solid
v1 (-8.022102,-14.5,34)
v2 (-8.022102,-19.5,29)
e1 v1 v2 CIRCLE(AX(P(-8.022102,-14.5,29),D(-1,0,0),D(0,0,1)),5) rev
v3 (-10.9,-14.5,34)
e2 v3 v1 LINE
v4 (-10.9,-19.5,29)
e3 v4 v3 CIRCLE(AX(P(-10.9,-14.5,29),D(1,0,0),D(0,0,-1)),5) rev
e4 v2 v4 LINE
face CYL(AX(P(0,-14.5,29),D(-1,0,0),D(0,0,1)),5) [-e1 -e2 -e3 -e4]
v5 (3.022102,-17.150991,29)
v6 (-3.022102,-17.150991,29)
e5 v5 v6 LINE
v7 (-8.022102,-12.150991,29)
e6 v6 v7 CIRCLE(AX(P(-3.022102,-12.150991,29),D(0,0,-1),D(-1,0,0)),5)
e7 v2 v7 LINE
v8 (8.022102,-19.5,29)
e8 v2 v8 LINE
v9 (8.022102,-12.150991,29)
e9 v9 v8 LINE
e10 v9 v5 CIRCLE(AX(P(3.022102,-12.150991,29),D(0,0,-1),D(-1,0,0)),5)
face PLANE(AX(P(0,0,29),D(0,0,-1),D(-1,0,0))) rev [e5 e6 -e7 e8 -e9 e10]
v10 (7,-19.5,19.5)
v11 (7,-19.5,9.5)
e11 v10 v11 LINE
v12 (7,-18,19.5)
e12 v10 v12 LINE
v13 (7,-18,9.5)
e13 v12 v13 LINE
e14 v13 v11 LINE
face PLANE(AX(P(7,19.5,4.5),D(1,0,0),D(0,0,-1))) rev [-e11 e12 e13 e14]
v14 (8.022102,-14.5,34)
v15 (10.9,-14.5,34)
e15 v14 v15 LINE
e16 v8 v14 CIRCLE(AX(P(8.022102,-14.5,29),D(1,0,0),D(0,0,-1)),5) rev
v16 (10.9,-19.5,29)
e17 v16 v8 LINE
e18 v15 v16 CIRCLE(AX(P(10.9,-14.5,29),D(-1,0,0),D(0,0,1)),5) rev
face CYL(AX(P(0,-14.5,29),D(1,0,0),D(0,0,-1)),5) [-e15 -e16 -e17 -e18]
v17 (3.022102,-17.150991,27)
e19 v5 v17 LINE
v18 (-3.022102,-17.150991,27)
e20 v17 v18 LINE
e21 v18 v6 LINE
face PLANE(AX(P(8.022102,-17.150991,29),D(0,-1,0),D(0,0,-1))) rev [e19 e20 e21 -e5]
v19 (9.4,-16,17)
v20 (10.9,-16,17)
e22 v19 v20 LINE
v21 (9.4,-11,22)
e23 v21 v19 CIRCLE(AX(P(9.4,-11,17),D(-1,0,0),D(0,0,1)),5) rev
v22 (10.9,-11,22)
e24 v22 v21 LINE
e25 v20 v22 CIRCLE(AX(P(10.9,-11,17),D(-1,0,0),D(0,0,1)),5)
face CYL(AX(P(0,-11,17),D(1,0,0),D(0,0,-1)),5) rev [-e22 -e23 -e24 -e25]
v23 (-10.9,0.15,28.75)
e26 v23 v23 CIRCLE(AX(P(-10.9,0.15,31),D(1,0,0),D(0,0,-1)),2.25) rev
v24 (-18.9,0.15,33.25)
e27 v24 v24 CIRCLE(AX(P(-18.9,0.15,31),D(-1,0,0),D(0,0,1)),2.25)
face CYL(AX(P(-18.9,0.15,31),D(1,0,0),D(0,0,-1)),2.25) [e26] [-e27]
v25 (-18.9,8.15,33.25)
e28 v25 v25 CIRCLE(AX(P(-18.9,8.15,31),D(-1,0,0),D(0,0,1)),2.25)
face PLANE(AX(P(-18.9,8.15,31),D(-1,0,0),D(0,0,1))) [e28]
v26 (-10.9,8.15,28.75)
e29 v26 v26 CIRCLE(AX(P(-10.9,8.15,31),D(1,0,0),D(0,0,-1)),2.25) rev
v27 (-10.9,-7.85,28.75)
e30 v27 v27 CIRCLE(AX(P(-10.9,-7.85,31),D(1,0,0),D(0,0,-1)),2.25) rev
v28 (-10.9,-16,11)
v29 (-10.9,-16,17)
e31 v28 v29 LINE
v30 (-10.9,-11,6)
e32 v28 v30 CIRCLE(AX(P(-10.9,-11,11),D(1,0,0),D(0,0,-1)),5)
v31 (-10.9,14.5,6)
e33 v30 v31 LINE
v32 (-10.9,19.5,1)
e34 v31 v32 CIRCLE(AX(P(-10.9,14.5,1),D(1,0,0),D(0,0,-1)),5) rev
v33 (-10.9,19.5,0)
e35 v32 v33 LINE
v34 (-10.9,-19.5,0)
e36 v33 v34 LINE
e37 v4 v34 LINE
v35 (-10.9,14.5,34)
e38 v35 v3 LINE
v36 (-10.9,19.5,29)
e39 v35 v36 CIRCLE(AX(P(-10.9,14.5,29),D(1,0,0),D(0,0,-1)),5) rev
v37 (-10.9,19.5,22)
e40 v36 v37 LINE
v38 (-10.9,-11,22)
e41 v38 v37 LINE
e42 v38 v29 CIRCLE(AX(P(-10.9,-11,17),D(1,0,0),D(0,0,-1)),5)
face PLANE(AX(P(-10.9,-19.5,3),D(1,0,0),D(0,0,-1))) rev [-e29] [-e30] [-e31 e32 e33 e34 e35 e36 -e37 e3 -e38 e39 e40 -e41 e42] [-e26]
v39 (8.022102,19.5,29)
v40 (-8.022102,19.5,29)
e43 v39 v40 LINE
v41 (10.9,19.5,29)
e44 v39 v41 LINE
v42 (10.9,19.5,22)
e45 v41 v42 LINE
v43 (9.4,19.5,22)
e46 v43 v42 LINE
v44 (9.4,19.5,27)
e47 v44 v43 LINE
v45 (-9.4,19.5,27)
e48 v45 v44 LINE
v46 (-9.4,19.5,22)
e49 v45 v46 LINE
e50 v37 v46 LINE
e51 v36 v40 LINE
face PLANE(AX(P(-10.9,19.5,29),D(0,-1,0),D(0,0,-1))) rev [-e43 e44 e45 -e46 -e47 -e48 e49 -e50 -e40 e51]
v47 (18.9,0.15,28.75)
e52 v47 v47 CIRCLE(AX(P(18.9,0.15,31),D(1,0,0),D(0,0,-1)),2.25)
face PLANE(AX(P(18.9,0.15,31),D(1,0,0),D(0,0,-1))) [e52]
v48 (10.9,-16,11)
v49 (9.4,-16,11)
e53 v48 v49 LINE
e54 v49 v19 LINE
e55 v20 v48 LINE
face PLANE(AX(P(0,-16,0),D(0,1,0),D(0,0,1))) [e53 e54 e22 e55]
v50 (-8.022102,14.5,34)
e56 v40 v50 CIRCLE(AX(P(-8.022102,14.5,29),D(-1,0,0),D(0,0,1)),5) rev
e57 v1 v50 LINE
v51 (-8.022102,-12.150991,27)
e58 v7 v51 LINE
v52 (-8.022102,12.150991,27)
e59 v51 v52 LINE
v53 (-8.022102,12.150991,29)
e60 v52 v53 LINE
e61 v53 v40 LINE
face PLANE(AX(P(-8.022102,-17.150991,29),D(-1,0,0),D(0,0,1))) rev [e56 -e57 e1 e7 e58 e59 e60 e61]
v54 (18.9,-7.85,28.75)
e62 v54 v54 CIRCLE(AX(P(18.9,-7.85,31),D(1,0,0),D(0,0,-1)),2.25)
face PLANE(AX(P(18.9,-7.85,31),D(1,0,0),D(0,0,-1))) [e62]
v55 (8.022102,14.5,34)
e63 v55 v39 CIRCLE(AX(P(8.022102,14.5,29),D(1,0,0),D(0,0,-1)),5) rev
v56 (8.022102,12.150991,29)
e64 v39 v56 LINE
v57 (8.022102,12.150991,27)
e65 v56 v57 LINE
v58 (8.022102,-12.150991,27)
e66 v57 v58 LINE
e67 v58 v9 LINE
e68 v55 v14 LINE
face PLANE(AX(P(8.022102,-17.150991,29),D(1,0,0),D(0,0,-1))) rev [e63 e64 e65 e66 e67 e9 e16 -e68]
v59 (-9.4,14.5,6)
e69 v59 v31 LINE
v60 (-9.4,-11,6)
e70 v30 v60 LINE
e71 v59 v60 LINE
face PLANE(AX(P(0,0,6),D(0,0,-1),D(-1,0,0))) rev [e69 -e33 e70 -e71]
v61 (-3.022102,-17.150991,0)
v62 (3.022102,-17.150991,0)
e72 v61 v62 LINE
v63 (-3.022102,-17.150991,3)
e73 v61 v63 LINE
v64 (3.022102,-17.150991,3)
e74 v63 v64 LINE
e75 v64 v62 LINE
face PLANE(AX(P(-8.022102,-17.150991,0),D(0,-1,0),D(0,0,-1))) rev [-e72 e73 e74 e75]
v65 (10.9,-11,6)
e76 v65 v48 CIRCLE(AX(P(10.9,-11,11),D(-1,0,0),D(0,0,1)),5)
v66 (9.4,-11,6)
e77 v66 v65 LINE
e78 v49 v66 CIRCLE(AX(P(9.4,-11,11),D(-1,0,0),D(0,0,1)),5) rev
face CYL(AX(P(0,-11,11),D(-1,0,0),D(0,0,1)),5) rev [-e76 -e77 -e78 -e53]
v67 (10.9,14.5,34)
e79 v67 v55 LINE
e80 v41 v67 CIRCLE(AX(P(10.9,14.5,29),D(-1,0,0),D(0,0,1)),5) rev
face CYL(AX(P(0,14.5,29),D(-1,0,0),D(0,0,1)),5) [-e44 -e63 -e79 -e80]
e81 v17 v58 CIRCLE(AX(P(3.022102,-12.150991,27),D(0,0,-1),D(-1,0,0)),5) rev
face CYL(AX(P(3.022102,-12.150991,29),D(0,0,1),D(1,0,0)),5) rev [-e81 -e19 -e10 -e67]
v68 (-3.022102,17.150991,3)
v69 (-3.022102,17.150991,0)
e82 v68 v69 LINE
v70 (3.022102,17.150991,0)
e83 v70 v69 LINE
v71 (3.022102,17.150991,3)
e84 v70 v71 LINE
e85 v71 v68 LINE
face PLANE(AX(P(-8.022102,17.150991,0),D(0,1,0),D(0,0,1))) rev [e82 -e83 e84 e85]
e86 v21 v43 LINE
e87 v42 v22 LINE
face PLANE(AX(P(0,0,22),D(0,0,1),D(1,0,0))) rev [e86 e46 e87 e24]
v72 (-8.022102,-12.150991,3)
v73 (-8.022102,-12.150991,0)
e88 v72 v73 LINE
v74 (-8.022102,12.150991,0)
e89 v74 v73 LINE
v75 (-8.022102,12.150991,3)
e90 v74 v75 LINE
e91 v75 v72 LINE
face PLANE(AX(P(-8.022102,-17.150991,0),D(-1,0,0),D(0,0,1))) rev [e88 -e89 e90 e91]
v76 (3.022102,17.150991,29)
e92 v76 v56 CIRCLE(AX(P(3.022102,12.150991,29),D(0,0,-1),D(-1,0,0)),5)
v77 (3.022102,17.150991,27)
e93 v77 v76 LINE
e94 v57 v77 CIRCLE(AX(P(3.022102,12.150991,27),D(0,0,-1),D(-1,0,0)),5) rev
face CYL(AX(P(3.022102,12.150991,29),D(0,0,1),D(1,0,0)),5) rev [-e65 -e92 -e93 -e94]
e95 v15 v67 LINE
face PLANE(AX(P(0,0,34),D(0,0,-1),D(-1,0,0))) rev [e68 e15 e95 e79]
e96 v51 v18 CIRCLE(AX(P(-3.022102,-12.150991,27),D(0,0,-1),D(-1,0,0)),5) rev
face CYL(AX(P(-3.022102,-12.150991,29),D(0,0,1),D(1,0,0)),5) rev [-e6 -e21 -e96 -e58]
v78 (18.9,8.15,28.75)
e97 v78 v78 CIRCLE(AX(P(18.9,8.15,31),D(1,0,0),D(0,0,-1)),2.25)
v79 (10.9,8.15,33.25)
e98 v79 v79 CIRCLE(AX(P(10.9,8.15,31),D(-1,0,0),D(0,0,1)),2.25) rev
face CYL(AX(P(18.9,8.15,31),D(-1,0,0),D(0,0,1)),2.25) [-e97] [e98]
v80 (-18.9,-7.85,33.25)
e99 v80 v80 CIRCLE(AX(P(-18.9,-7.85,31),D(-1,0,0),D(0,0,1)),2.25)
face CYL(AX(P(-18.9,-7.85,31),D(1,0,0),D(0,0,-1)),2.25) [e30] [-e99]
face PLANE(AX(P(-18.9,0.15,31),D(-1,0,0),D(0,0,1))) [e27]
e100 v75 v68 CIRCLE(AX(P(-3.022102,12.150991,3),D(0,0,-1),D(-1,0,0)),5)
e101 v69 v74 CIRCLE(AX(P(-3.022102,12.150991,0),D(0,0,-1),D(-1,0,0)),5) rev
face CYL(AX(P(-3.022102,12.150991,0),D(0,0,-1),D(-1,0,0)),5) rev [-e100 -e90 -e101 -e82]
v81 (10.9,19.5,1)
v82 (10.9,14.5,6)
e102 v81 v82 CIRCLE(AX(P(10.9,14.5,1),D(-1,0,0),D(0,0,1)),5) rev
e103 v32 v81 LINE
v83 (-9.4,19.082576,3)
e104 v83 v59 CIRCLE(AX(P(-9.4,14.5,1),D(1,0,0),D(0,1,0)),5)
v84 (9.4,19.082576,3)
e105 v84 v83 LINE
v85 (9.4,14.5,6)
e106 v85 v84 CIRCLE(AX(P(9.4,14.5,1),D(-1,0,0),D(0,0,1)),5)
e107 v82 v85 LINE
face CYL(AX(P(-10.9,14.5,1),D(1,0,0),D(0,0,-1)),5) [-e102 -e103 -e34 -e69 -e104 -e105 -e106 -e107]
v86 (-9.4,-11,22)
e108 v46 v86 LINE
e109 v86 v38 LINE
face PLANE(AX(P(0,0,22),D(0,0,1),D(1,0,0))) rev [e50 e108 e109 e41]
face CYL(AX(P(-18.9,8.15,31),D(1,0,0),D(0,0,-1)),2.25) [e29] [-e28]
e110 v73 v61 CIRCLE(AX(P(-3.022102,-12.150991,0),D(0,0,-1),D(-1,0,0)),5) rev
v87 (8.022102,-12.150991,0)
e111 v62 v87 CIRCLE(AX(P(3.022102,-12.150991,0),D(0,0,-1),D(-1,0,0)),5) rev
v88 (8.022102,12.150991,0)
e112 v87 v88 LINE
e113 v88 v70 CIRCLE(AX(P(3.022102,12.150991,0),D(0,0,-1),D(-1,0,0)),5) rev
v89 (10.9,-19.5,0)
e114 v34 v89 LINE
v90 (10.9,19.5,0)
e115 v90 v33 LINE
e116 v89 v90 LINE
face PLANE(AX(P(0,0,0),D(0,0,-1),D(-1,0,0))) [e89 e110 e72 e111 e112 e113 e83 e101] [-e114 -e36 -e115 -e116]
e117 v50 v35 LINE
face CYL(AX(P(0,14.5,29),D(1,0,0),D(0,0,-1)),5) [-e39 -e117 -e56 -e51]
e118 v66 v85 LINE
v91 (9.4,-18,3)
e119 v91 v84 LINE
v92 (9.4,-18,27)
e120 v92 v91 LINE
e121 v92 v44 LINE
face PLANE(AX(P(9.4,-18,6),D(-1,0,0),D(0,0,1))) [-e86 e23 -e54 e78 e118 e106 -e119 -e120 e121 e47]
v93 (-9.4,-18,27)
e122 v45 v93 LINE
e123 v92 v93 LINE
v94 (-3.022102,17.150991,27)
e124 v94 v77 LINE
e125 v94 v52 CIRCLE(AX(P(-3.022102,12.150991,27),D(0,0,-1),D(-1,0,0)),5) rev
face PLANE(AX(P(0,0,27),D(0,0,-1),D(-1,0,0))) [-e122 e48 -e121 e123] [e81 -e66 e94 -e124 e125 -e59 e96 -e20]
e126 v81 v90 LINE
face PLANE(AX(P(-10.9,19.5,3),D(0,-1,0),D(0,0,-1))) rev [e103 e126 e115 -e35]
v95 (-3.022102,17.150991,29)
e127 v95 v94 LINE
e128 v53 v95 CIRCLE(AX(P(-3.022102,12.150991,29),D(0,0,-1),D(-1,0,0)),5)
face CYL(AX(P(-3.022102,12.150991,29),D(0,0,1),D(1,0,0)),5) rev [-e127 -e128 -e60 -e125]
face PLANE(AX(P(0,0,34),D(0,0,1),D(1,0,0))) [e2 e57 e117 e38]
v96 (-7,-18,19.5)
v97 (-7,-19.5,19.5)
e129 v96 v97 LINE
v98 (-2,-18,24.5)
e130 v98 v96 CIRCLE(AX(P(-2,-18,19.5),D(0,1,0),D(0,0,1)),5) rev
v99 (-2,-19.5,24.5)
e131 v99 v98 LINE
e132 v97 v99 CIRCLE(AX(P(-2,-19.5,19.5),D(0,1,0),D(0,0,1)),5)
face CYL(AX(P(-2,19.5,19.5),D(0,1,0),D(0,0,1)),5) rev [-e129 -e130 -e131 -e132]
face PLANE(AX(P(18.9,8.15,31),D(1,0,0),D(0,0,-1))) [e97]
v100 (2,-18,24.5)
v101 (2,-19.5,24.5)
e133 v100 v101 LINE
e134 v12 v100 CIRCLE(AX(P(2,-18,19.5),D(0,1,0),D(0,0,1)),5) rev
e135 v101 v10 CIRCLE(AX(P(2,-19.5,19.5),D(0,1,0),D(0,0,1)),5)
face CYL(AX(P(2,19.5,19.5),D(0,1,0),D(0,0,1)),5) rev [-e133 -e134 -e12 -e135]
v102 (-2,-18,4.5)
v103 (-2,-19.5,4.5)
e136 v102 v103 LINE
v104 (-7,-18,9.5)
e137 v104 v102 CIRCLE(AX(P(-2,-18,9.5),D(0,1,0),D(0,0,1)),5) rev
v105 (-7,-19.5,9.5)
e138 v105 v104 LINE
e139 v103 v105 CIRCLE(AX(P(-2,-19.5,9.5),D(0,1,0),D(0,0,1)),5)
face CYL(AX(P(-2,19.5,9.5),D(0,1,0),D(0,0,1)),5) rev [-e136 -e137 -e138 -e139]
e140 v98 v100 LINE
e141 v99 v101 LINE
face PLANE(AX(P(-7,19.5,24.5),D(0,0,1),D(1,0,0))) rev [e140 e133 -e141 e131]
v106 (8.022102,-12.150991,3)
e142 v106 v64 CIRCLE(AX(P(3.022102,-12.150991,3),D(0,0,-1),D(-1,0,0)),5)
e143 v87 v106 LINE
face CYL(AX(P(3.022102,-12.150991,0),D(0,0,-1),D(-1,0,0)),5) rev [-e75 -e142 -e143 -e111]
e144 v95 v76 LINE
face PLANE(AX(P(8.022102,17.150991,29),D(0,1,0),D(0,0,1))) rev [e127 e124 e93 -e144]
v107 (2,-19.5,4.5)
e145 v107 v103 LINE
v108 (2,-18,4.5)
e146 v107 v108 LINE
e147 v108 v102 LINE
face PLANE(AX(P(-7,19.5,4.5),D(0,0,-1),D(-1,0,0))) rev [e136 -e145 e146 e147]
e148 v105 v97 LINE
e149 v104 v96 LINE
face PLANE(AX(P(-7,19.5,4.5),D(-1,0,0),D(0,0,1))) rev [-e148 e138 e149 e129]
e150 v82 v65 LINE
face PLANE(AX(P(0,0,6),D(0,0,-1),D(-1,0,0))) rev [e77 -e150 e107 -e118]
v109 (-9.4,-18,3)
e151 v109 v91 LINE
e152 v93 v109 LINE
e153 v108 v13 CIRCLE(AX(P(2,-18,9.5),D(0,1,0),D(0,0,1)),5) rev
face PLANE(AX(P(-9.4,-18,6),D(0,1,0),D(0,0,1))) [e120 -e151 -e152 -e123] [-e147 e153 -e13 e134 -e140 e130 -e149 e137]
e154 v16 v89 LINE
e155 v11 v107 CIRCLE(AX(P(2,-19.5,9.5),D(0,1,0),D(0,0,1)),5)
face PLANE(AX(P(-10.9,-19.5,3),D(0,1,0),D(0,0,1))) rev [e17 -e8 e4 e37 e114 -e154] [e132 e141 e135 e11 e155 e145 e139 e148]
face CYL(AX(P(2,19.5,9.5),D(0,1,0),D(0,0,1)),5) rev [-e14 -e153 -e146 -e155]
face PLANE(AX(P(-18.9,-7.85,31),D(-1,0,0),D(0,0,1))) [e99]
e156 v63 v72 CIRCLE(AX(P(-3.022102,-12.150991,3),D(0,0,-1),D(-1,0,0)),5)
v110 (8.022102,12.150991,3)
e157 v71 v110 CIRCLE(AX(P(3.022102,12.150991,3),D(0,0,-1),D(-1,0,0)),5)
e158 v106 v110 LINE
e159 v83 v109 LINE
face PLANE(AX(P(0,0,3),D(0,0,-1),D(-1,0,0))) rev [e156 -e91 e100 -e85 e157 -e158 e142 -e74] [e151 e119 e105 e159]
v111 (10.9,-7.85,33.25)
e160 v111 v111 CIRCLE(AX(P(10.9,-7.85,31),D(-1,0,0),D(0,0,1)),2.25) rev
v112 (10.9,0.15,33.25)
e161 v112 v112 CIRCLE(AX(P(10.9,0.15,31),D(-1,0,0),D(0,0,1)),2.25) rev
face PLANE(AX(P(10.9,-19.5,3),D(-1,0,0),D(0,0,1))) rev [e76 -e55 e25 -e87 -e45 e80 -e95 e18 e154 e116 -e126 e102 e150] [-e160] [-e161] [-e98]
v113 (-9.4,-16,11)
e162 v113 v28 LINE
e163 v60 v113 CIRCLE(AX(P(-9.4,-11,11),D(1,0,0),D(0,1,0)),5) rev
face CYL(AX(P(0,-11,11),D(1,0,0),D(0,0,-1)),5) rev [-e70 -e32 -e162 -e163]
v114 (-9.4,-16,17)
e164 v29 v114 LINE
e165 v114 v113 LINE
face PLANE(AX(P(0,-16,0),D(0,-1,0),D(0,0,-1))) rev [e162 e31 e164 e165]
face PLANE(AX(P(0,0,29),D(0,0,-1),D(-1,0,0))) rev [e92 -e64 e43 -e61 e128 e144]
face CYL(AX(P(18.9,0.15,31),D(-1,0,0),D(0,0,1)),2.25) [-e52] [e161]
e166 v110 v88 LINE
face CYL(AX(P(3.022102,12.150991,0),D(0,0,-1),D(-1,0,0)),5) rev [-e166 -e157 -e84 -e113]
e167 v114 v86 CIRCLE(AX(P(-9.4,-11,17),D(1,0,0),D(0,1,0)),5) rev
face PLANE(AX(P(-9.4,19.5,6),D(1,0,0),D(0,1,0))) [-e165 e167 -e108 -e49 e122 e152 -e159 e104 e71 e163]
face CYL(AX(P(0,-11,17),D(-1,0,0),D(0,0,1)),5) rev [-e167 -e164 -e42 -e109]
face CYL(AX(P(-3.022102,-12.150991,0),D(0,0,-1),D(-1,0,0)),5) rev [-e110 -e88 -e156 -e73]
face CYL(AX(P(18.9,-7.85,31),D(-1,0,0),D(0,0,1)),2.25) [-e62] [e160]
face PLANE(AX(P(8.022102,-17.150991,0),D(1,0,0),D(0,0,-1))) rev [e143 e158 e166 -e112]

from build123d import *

# Parameters (mm, degrees)
SKETCH1_W               = 21.8
SKETCH1_H               = 39
BOSS_EXTRUDE1_DEPTH     = 3
BOSS_EXTRUDE2_DEPTH     = 3
BOSS_EXTRUDE4_DEPTH     = 21
SKETCH4_W               = 21.8
SKETCH4_H               = 39
BOSS_EXTRUDE5_DEPTH     = 2
CUT_EXTRUDE1_DEPTH      = 50.807730324
CUT_EXTRUDE1_DEPTH_BACK = 50.807730324
SKETCH5_W               = 14
SKETCH5_H               = 20
BOSS_EXTRUDE6_DEPTH     = 5
SKETCH7_W               = 14.6
SKETCH7_H               = 1.5
CUT_EXTRUDE2_DEPTH      = 2
SKETCH8_W               = 16.04420395
SKETCH8_H               = 34.30198165
CUT_EXTRUDE3_DEPTH      = 35.279148181
SKETCH9_W               = 16.04420395
SKETCH9_H               = 34.30198165
CUT_EXTRUDE4_DEPTH      = 2
SKETCH10_W              = 2.1
SKETCH10_H              = 1.5
CUT_EXTRUDE5_DEPTH      = 2
SKETCH11_W              = 2.1
SKETCH11_H              = 1.5
CUT_EXTRUDE6_DEPTH      = 2
SKETCH13_W              = 18.8
SKETCH13_H              = 1.5
CUT_EXTRUDE7_DEPTH      = 3
FILLET3_R               = 5
FILLET4_R               = 5
SKETCH17_W              = 1.5
SKETCH17_H              = 16
BOSS_EXTRUDE8_DEPTH     = 2
FILLET5_R               = 5
BOSS_EXTRUDE9_DEPTH     = 5
SKETCH24_R              = 2.25
BOSS_EXTRUDE10_DEPTH    = 8
BOSS_EXTRUDE11_START    = 8
SKETCH25_R              = 2.25
BOSS_EXTRUDE11_DEPTH    = 8
FILLET7_R               = 5


with BuildPart() as part:
    # Sketch1 → Boss-Extrude1 (new body)
    with BuildSketch(Plane.XY):
        Rectangle(SKETCH1_W, SKETCH1_H)
    extrude(amount=BOSS_EXTRUDE1_DEPTH)

    # Sketch2 → Boss-Extrude2 (add)
    with BuildSketch(Plane.XY.offset(3)):
        Polygon((-10.9, 19.5), (-9.4, 19.5), (-9.4, -18), (9.4, -18), (9.4, 19.5), (10.9, 19.5), (10.9, -19.5), (-10.9, -19.5), align=None)
    extrude(amount=BOSS_EXTRUDE2_DEPTH)

    # Sketch3 → Boss-Extrude4 (add)
    with BuildSketch(Plane.XY.offset(6)):
        Polygon((-9.4, -18), (-10.9, -18), (-10.9, -19.5), (10.9, -19.5), (10.9, -18), align=None)
    extrude(amount=BOSS_EXTRUDE4_DEPTH)

    # Sketch4 → Boss-Extrude5 (add)
    with BuildSketch(Plane.XY.offset(27)):
        Rectangle(SKETCH4_W, SKETCH4_H)
    extrude(amount=BOSS_EXTRUDE5_DEPTH)

    # Sketch5 → Cut-Extrude1 (cut, two sides: drawn at the far end of the back side and taken through both)
    with BuildSketch(Plane.XZ.offset(19.5).offset(-CUT_EXTRUDE1_DEPTH_BACK)):
        with Locations((0, 14.5)):
            Rectangle(SKETCH5_W, SKETCH5_H)
    extrude(amount=CUT_EXTRUDE1_DEPTH + CUT_EXTRUDE1_DEPTH_BACK, mode=Mode.SUBTRACT)

    # Sketch6 → Boss-Extrude6 (add)
    with BuildSketch(Plane(origin=(0, 0, 27), x_dir=(-1, 0, 0), z_dir=(0, 0, -1))):
        Polygon((-9.4, -18), (-9.4, 18), (9.4, 18), (9.4, -18), (10.9, -18), (10.9, 19.5), (-10.9, 19.5), (-10.9, -18), align=None)
    extrude(amount=BOSS_EXTRUDE6_DEPTH)

    # Sketch7 → Cut-Extrude2 (cut)
    with BuildSketch(Plane(origin=(0, 0, 22), x_dir=(-1, 0, 0), z_dir=(0, 0, -1))):
        with Locations((0, 18.75)):
            Rectangle(SKETCH7_W, SKETCH7_H)
    extrude(amount=-CUT_EXTRUDE2_DEPTH, mode=Mode.SUBTRACT)

    # Sketch8 → Cut-Extrude3 (cut, through all)
    with BuildSketch(Plane.XY.offset(3)):
        Rectangle(SKETCH8_W, SKETCH8_H)
    extrude(amount=-CUT_EXTRUDE3_DEPTH, mode=Mode.SUBTRACT)

    # Sketch9 → Cut-Extrude4 (cut)
    with BuildSketch(Plane(origin=(0, 0, 27), x_dir=(-1, 0, 0), z_dir=(0, 0, -1))):
        Rectangle(SKETCH9_W, SKETCH9_H)
    extrude(amount=-CUT_EXTRUDE4_DEPTH, mode=Mode.SUBTRACT)

    # Sketch10 → Cut-Extrude5 (cut)
    with BuildSketch(Plane(origin=(0, 0, 22), x_dir=(-1, 0, 0), z_dir=(0, 0, -1))):
        with Locations((8.35, 18.75)):
            Rectangle(SKETCH10_W, SKETCH10_H)
    extrude(amount=-CUT_EXTRUDE5_DEPTH, mode=Mode.SUBTRACT)

    # Sketch11 → Cut-Extrude6 (cut)
    with BuildSketch(Plane(origin=(0, 0, 22), x_dir=(-1, 0, 0), z_dir=(0, 0, -1))):
        with Locations((-8.35, 18.75)):
            Rectangle(SKETCH11_W, SKETCH11_H)
    extrude(amount=-CUT_EXTRUDE6_DEPTH, mode=Mode.SUBTRACT)

    # Sketch13 → Cut-Extrude7 (cut)
    with BuildSketch(Plane(origin=(0, 0, 24), x_dir=(-1, 0, 0), z_dir=(0, 0, -1))):
        with Locations((0, 18.75)):
            Rectangle(SKETCH13_W, SKETCH13_H)
    extrude(amount=-CUT_EXTRUDE7_DEPTH, mode=Mode.SUBTRACT)

    # Fillet3
    fillet3_edges = [part.edges().sort_by_distance(p)[0] for p in [
        (8.022101975, 17.150990825, 1.5),
        (8.022101975, -17.150990825, 1.5),
        (-8.022101975, -17.150990825, 1.5),
        (-8.022101975, 17.150990825, 1.5),
        (-8.022101975, -17.150990825, 28),
        (8.022101975, -17.150990825, 28),
    ]]
    fillet(fillet3_edges, radius=FILLET3_R)

    # Fillet4
    fillet4_edges = [part.edges().sort_by_distance(p)[0] for p in [
        (-8.022101975, 17.150990825, 28),
        (8.022101975, 17.150990825, 28),
    ]]
    fillet(fillet4_edges, radius=FILLET4_R)

    # Sketch17 → Boss-Extrude8 (add)
    with BuildSketch(Plane(origin=(0, -18, 0), x_dir=(1, 0, 0), z_dir=(0, 1, 0))):
        with Locations((-10.15, -14)):
            Rectangle(SKETCH17_W, SKETCH17_H)
        with Locations((10.15, -14)):
            Rectangle(SKETCH17_W, SKETCH17_H)
    extrude(amount=BOSS_EXTRUDE8_DEPTH)

    # Fillet5
    fillet5_edges = [part.edges().sort_by_distance(p)[0] for p in [
        (-10.15, -16, 22),
        (-10.15, -16, 6),
        (10.15, -16, 6),
        (10.15, -16, 22),
        (7, -18.75, 24.5),
        (7, -18.75, 4.5),
        (-7, -18.75, 4.5),
        (-7, -18.75, 24.5),
    ]]
    fillet(fillet5_edges, radius=FILLET5_R)

    # Sketch19 → Boss-Extrude9 (add)
    with BuildSketch(Plane.XY.offset(29)):
        Polygon((-10.9, 19.5), (-10.9, -19.5), (-8.022101975, -19.5), (-8.022101975, -12.150990825), (-8.022101975, 12.150990825), (-8.022101975, 19.5), align=None)
        Polygon((8.022101975, 12.150990825), (8.022101975, 19.5), (10.9, 19.5), (10.9, -19.5), (8.022101975, -19.5), align=None)
    extrude(amount=BOSS_EXTRUDE9_DEPTH)

    # Sketch24 → Boss-Extrude10 (add)
    with BuildSketch(Plane.ZY.offset(10.9)):
        with Locations(Location((31, 8.15, 0), (0, 0, 180))):
            Circle(SKETCH24_R)
        with Locations(Location((31, 0.15, 0), (0, 0, 180))):
            Circle(SKETCH24_R)
        with Locations(Location((31, -7.85, 0), (0, 0, 180))):
            Circle(SKETCH24_R)
    extrude(amount=BOSS_EXTRUDE10_DEPTH)

    # Sketch25 → Boss-Extrude11 (add)
    with BuildSketch(Plane(origin=(10.9, 0, 0), x_dir=(0, 0, -1), z_dir=(1, 0, 0)).offset(BOSS_EXTRUDE11_START)):
        with Locations((-31, 8.15)):
            Circle(SKETCH25_R)
        with Locations((-31, 0.15)):
            Circle(SKETCH25_R)
        with Locations((-31, -7.85)):
            Circle(SKETCH25_R)
    extrude(amount=-BOSS_EXTRUDE11_DEPTH)

    # Fillet7
    fillet7_edges = [part.edges().sort_by_distance(p)[0] for p in [
        (-9.461050988, -19.5, 34),
        (9.461050988, -19.5, 34),
        (-10.15, 19.5, 6),
        (9.461050988, 19.5, 34),
        (-9.461050988, 19.5, 34),
    ]]
    fillet(fillet7_edges, radius=FILLET7_R - 0.0001)  # a hair under: the kernel refuses the full size


solid = part.part
